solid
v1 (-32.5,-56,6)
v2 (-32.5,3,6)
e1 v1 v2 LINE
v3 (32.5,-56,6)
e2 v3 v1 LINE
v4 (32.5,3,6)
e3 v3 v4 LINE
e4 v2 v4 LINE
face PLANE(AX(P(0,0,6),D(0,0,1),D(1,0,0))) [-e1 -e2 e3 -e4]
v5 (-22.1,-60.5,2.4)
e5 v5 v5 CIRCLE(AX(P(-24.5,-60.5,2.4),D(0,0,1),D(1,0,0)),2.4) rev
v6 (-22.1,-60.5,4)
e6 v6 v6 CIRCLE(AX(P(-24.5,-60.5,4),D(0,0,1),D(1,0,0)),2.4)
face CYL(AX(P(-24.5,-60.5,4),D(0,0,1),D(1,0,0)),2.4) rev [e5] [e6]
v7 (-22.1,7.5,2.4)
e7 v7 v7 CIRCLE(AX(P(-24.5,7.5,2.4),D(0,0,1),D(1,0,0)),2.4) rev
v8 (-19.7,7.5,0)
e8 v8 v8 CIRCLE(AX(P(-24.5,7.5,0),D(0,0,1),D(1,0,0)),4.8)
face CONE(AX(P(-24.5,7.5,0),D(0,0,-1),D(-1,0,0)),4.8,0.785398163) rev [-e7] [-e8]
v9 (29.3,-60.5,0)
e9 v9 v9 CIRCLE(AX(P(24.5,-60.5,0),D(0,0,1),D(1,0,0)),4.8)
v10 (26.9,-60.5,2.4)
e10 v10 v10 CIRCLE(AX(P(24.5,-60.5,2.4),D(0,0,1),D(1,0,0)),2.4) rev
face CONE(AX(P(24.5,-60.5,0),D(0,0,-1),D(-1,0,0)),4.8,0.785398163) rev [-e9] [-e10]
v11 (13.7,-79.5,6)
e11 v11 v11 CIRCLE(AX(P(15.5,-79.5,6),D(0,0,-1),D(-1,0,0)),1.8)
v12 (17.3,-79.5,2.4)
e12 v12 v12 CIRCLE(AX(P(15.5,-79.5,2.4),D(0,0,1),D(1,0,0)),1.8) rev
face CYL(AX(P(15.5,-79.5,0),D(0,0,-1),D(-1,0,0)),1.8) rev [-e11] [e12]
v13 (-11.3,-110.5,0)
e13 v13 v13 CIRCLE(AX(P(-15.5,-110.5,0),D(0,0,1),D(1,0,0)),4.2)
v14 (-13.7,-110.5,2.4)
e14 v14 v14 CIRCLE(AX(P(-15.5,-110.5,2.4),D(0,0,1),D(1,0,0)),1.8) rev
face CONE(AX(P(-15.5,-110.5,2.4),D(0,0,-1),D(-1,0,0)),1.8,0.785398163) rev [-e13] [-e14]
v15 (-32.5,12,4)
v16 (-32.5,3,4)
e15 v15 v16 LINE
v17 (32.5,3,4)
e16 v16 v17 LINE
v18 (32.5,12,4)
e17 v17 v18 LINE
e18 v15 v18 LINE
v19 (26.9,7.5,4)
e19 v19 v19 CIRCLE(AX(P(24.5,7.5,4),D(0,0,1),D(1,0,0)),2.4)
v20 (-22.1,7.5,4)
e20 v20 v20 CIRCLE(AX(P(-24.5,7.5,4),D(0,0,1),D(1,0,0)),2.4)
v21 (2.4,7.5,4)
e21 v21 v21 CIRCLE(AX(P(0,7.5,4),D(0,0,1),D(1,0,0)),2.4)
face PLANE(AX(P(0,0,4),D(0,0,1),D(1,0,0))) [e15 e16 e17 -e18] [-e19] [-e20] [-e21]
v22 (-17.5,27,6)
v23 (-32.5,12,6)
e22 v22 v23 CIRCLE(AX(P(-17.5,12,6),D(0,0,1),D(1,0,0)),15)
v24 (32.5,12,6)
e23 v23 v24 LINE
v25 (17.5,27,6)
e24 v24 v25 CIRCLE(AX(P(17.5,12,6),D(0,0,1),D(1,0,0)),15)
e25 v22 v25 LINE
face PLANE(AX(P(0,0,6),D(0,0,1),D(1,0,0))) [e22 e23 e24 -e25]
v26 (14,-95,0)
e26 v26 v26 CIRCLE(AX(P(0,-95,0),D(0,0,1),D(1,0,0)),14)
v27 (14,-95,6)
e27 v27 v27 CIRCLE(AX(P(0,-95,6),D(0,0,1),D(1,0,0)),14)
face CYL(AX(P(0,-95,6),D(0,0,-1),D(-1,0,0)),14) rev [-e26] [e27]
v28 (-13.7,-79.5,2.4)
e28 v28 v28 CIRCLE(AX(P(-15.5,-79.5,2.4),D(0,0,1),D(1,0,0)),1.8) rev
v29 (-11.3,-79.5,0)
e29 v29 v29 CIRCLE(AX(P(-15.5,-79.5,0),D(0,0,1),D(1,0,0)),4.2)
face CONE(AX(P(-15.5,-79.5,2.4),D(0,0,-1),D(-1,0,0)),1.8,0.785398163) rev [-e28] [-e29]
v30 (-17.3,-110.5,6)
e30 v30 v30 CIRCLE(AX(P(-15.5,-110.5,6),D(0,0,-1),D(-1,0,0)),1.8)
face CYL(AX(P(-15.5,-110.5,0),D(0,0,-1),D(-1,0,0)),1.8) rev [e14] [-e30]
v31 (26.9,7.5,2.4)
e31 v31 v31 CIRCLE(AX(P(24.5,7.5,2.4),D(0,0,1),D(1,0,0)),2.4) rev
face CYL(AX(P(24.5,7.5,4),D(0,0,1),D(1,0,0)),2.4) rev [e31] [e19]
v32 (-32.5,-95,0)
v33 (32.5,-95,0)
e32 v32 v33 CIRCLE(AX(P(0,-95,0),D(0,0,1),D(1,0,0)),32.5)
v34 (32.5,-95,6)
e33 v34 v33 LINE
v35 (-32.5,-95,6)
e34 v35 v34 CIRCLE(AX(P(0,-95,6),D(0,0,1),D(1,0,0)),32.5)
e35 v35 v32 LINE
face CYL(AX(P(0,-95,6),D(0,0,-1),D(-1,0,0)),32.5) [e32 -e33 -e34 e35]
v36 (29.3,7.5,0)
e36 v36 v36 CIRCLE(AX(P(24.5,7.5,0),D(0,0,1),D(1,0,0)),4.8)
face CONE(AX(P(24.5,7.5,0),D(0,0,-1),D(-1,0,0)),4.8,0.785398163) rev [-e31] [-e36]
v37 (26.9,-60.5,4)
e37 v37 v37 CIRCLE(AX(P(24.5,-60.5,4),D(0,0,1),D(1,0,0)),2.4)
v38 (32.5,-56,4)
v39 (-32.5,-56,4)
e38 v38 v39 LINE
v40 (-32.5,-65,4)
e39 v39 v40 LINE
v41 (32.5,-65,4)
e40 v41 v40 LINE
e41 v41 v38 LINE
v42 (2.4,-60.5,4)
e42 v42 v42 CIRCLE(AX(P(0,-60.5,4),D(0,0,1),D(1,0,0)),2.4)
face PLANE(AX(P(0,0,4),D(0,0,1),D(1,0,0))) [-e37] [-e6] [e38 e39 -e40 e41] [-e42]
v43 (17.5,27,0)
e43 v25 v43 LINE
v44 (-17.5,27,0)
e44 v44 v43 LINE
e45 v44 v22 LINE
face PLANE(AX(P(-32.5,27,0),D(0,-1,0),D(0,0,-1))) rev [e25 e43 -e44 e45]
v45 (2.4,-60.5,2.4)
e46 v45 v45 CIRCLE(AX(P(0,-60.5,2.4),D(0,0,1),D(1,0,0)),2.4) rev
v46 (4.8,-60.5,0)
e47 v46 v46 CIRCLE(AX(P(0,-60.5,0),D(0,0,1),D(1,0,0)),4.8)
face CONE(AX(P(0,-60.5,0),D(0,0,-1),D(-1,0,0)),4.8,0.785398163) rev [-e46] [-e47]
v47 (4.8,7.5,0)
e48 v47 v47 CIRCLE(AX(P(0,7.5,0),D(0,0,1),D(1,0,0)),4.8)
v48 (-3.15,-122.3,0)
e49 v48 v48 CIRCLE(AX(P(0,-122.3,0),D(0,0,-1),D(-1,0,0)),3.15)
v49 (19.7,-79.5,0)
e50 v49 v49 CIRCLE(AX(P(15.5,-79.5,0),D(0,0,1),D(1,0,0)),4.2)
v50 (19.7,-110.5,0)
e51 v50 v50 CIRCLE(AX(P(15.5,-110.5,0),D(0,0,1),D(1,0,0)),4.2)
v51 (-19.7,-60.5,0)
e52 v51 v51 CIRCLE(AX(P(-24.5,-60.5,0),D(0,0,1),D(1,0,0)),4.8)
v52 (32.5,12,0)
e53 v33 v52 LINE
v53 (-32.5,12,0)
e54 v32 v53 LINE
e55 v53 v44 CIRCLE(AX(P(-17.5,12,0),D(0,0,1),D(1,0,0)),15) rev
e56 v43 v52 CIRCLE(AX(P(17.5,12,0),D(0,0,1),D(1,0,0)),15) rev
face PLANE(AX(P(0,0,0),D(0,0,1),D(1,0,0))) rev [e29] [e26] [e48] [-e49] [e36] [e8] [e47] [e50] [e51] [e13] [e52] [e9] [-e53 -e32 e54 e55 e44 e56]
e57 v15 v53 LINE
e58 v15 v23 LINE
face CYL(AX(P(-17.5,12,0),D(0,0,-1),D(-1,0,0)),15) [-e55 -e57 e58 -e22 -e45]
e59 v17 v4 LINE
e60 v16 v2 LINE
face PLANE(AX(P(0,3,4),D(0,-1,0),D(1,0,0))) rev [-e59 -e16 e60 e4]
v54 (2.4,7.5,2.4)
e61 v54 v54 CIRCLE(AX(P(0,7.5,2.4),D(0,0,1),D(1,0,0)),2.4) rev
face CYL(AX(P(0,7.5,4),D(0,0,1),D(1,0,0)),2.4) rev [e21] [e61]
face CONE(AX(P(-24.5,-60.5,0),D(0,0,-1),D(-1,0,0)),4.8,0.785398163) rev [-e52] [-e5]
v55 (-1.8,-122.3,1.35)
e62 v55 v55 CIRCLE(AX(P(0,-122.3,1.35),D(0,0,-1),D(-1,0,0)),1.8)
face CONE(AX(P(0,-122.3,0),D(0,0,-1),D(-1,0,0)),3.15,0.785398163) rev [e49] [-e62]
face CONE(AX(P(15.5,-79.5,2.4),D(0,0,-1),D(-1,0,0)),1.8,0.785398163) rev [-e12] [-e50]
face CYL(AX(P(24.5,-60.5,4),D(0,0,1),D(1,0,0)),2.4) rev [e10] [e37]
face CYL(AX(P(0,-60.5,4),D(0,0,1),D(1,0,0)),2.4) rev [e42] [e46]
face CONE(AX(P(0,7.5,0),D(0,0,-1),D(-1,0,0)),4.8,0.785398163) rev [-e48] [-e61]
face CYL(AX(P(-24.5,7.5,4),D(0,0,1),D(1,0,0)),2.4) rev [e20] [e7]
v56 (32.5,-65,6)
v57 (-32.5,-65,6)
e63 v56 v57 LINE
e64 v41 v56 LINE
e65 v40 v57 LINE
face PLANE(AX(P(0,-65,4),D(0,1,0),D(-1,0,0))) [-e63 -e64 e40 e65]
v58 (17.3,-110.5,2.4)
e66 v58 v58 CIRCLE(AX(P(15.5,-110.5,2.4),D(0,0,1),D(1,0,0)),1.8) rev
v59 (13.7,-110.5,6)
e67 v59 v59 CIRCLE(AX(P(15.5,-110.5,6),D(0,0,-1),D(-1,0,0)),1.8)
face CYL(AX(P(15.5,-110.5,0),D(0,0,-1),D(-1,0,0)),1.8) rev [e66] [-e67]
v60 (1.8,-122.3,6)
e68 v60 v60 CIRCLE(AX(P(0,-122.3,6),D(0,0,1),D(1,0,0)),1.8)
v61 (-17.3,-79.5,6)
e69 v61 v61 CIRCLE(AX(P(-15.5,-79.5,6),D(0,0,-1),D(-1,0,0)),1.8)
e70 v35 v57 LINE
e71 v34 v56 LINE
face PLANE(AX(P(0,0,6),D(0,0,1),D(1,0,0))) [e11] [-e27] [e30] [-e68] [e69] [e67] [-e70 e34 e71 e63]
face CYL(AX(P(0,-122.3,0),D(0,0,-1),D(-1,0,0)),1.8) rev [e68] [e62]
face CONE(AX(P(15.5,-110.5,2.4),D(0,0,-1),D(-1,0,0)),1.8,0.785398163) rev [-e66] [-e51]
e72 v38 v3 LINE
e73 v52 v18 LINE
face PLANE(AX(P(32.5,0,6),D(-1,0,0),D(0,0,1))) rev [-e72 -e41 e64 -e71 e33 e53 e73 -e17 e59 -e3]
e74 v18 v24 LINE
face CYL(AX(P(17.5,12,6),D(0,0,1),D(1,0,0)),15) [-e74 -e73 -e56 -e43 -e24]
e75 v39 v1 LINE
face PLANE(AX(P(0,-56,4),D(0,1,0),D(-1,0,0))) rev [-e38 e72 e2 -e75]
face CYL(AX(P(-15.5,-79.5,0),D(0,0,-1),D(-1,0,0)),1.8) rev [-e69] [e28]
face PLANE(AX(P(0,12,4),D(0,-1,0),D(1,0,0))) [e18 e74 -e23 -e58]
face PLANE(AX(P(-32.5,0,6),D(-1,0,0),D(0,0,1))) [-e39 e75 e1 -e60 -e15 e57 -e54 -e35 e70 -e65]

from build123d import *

# Parameters (mm, degrees)
BOSS_EXTRUDE1_DEPTH                             = 6
M3_CLEARANCE_HOLE1_D                            = 3.6
M3_CLEARANCE_HOLE1_DEPTH                        = 6
M3_CLEARANCE_HOLE1_TIP                          = 1.081549114
FILLET1_R                                       = 15
SKETCH4_W                                       = 65
SKETCH4_H                                       = 9
SKETCH4_W_2                                     = 32.5
CUT_EXTRUDE1_DEPTH                              = 2
M4_CLEARANCE_HOLE1_D                            = 4.8
M4_CLEARANCE_HOLE1_DEPTH                        = 6
M4_CLEARANCE_HOLE1_TIP                          = 1.442065486
CHAMFER1_SIZE                                   = 2.4
SKETCH7_W                                       = 65
SKETCH7_H                                       = 78
CUT_EXTRUDE3_DEPTH                              = 132.713704678
FILLET2_R                                       = 15
CSK_FOR_M3_FLAT_HEAD_MACHINE_SCREW1_D           = 3.6
CSK_FOR_M3_FLAT_HEAD_MACHINE_SCREW1_DEPTH       = 20
CSK_FOR_M3_FLAT_HEAD_MACHINE_SCREW1_CSINK_D     = 6.3
CSK_FOR_M3_FLAT_HEAD_MACHINE_SCREW1_CSINK_ANGLE = 90
CSK_FOR_M3_FLAT_HEAD_MACHINE_SCREW1_TIP         = 1.081549114


with BuildPart() as part:
    # Sketch1 → Boss-Extrude1 (new body)
    with BuildSketch(Plane.XY):
        with BuildLine():
            Line((-32.5, 95), (-32.5, -95))
            ThreePointArc((-32.5, -95), (0, -62.5), (32.5, -95))
            Line((32.5, -95), (32.5, 95))
            Line((32.5, 95), (-32.5, 95))
        make_face()
        with BuildLine():
            ThreePointArc((32.5, -95), (0, -62.5), (-32.5, -95))
            Line((-32.5, -95), (-15.5, -95))
            Line((-15.5, -95), (-15.5, -79.5))
            Line((-15.5, -79.5), (15.5, -79.5))
            Line((15.5, -79.5), (15.5, -95))
            Line((15.5, -95), (32.5, -95))
        make_face()
        with BuildLine():
            Line((-15.5, -95), (-32.5, -95))
            ThreePointArc((-32.5, -95), (0, -127.5), (32.5, -95))
            Line((32.5, -95), (15.5, -95))
            Line((15.5, -95), (15.5, -110.5))
            Line((15.5, -110.5), (-15.5, -110.5))
            Line((-15.5, -110.5), (-15.5, -95))
        make_face()
        with BuildLine():
            Line((-14, -95), (-15.5, -95))
            Line((-15.5, -95), (-15.5, -110.5))
            Line((-15.5, -110.5), (15.5, -110.5))
            Line((15.5, -110.5), (15.5, -95))
            Line((15.5, -95), (14, -95))
            ThreePointArc((14, -95), (0, -109), (-14, -95))
        make_face()
        with BuildLine():
            Line((-15.5, -79.5), (-15.5, -95))
            Line((-15.5, -95), (-14, -95))
            ThreePointArc((-14, -95), (0, -81), (14, -95))
            Line((14, -95), (15.5, -95))
            Line((15.5, -95), (15.5, -79.5))
            Line((15.5, -79.5), (-15.5, -79.5))
        make_face()
    extrude(amount=BOSS_EXTRUDE1_DEPTH)

    # M3 Clearance Hole1
    with Locations(Plane(origin=(0, 0, 0), x_dir=(-1, 0, 0), z_dir=(0, 0, -1))):
        with Locations((-15.5, -110.5), (15.5, -110.5), (15.5, -79.5), (-15.5, -79.5)):
            Hole(M3_CLEARANCE_HOLE1_D / 2, depth=M3_CLEARANCE_HOLE1_DEPTH)
            with Locations((0, 0, -(M3_CLEARANCE_HOLE1_DEPTH + M3_CLEARANCE_HOLE1_TIP / 2))):  # 118° drill point
                Cone(0, M3_CLEARANCE_HOLE1_D / 2, M3_CLEARANCE_HOLE1_TIP, mode=Mode.SUBTRACT)

    # Fillet1
    fillet1_edges = [part.edges().sort_by_distance(p)[0] for p in [
        (-32.5, 95, 3),
        (32.5, 95, 3),
    ]]
    fillet(fillet1_edges, radius=FILLET1_R)

    # Sketch4 → Cut-Extrude1 (cut)
    with BuildSketch(Plane.XY.offset(6)):
        with Locations((0, 75.5)):
            Rectangle(SKETCH4_W, SKETCH4_H)
        with Locations((-16.25, 7.5)):
            Rectangle(SKETCH4_W_2, SKETCH4_H)
        with Locations((16.25, 7.5)):
            Rectangle(SKETCH4_W_2, SKETCH4_H)
        with Locations((0, -60.5)):
            Rectangle(SKETCH4_W, SKETCH4_H)
    extrude(amount=-CUT_EXTRUDE1_DEPTH, mode=Mode.SUBTRACT)

    # M4 Clearance Hole1
    with Locations(Plane.XY.offset(4)):
        with Locations((-24.5, -60.5), (-24.5, 75.5), (24.5, 75.5), (0, 75.5), (-24.5, 7.5), (0, 7.5), (24.5, 7.5), (24.5, -60.5), (0, -60.5)):
            Hole(M4_CLEARANCE_HOLE1_D / 2, depth=M4_CLEARANCE_HOLE1_DEPTH)
            with Locations((0, 0, -(M4_CLEARANCE_HOLE1_DEPTH + M4_CLEARANCE_HOLE1_TIP / 2))):  # 118° drill point
                Cone(0, M4_CLEARANCE_HOLE1_D / 2, M4_CLEARANCE_HOLE1_TIP, mode=Mode.SUBTRACT)

    # Chamfer1
    chamfer1_edges = [part.edges().sort_by_distance(p)[0] for p in [
        (-22.1, -60.5, 0),
        (2.4, -60.5, 0),
        (26.9, -60.5, 0),
        (26.9, 7.5, 0),
        (2.4, 7.5, 0),
        (-22.1, 7.5, 0),
        (2.4, 75.5, 0),
        (26.9, 75.5, 0),
        (-22.1, 75.5, 0),
        (13.7, -79.5, 0),
        (-17.3, -79.5, 0),
        (-17.3, -110.5, 0),
        (13.7, -110.5, 0),
    ]]
    chamfer(chamfer1_edges, length=CHAMFER1_SIZE)

    # Sketch7 → Cut-Extrude3 (cut, through all)
    with BuildSketch(Plane.XY.offset(6)):
        with Locations((0, 66)):
            Rectangle(SKETCH7_W, SKETCH7_H)
    extrude(amount=-CUT_EXTRUDE3_DEPTH, mode=Mode.SUBTRACT)

    # Fillet2
    fillet2_edges = [part.edges().sort_by_distance(p)[0] for p in [
        (32.5, 27, 3),
        (-32.5, 27, 3),
    ]]
    fillet(fillet2_edges, radius=FILLET2_R - 0.0001)  # a hair under: the kernel refuses the full size

    # CSK for M3 Flat Head Machine Screw1
    with Locations(Plane(origin=(0, 0, 0), x_dir=(1, 0, 0), z_dir=(0, 0, -1))):
        with Locations((0, 122.3)):
            CounterSinkHole(CSK_FOR_M3_FLAT_HEAD_MACHINE_SCREW1_D / 2, CSK_FOR_M3_FLAT_HEAD_MACHINE_SCREW1_CSINK_D / 2, depth=CSK_FOR_M3_FLAT_HEAD_MACHINE_SCREW1_DEPTH, counter_sink_angle=CSK_FOR_M3_FLAT_HEAD_MACHINE_SCREW1_CSINK_ANGLE)
            with Locations((0, 0, -(CSK_FOR_M3_FLAT_HEAD_MACHINE_SCREW1_DEPTH + CSK_FOR_M3_FLAT_HEAD_MACHINE_SCREW1_TIP / 2))):  # 118° drill point
                Cone(0, CSK_FOR_M3_FLAT_HEAD_MACHINE_SCREW1_D / 2, CSK_FOR_M3_FLAT_HEAD_MACHINE_SCREW1_TIP, mode=Mode.SUBTRACT)


solid = part.part
